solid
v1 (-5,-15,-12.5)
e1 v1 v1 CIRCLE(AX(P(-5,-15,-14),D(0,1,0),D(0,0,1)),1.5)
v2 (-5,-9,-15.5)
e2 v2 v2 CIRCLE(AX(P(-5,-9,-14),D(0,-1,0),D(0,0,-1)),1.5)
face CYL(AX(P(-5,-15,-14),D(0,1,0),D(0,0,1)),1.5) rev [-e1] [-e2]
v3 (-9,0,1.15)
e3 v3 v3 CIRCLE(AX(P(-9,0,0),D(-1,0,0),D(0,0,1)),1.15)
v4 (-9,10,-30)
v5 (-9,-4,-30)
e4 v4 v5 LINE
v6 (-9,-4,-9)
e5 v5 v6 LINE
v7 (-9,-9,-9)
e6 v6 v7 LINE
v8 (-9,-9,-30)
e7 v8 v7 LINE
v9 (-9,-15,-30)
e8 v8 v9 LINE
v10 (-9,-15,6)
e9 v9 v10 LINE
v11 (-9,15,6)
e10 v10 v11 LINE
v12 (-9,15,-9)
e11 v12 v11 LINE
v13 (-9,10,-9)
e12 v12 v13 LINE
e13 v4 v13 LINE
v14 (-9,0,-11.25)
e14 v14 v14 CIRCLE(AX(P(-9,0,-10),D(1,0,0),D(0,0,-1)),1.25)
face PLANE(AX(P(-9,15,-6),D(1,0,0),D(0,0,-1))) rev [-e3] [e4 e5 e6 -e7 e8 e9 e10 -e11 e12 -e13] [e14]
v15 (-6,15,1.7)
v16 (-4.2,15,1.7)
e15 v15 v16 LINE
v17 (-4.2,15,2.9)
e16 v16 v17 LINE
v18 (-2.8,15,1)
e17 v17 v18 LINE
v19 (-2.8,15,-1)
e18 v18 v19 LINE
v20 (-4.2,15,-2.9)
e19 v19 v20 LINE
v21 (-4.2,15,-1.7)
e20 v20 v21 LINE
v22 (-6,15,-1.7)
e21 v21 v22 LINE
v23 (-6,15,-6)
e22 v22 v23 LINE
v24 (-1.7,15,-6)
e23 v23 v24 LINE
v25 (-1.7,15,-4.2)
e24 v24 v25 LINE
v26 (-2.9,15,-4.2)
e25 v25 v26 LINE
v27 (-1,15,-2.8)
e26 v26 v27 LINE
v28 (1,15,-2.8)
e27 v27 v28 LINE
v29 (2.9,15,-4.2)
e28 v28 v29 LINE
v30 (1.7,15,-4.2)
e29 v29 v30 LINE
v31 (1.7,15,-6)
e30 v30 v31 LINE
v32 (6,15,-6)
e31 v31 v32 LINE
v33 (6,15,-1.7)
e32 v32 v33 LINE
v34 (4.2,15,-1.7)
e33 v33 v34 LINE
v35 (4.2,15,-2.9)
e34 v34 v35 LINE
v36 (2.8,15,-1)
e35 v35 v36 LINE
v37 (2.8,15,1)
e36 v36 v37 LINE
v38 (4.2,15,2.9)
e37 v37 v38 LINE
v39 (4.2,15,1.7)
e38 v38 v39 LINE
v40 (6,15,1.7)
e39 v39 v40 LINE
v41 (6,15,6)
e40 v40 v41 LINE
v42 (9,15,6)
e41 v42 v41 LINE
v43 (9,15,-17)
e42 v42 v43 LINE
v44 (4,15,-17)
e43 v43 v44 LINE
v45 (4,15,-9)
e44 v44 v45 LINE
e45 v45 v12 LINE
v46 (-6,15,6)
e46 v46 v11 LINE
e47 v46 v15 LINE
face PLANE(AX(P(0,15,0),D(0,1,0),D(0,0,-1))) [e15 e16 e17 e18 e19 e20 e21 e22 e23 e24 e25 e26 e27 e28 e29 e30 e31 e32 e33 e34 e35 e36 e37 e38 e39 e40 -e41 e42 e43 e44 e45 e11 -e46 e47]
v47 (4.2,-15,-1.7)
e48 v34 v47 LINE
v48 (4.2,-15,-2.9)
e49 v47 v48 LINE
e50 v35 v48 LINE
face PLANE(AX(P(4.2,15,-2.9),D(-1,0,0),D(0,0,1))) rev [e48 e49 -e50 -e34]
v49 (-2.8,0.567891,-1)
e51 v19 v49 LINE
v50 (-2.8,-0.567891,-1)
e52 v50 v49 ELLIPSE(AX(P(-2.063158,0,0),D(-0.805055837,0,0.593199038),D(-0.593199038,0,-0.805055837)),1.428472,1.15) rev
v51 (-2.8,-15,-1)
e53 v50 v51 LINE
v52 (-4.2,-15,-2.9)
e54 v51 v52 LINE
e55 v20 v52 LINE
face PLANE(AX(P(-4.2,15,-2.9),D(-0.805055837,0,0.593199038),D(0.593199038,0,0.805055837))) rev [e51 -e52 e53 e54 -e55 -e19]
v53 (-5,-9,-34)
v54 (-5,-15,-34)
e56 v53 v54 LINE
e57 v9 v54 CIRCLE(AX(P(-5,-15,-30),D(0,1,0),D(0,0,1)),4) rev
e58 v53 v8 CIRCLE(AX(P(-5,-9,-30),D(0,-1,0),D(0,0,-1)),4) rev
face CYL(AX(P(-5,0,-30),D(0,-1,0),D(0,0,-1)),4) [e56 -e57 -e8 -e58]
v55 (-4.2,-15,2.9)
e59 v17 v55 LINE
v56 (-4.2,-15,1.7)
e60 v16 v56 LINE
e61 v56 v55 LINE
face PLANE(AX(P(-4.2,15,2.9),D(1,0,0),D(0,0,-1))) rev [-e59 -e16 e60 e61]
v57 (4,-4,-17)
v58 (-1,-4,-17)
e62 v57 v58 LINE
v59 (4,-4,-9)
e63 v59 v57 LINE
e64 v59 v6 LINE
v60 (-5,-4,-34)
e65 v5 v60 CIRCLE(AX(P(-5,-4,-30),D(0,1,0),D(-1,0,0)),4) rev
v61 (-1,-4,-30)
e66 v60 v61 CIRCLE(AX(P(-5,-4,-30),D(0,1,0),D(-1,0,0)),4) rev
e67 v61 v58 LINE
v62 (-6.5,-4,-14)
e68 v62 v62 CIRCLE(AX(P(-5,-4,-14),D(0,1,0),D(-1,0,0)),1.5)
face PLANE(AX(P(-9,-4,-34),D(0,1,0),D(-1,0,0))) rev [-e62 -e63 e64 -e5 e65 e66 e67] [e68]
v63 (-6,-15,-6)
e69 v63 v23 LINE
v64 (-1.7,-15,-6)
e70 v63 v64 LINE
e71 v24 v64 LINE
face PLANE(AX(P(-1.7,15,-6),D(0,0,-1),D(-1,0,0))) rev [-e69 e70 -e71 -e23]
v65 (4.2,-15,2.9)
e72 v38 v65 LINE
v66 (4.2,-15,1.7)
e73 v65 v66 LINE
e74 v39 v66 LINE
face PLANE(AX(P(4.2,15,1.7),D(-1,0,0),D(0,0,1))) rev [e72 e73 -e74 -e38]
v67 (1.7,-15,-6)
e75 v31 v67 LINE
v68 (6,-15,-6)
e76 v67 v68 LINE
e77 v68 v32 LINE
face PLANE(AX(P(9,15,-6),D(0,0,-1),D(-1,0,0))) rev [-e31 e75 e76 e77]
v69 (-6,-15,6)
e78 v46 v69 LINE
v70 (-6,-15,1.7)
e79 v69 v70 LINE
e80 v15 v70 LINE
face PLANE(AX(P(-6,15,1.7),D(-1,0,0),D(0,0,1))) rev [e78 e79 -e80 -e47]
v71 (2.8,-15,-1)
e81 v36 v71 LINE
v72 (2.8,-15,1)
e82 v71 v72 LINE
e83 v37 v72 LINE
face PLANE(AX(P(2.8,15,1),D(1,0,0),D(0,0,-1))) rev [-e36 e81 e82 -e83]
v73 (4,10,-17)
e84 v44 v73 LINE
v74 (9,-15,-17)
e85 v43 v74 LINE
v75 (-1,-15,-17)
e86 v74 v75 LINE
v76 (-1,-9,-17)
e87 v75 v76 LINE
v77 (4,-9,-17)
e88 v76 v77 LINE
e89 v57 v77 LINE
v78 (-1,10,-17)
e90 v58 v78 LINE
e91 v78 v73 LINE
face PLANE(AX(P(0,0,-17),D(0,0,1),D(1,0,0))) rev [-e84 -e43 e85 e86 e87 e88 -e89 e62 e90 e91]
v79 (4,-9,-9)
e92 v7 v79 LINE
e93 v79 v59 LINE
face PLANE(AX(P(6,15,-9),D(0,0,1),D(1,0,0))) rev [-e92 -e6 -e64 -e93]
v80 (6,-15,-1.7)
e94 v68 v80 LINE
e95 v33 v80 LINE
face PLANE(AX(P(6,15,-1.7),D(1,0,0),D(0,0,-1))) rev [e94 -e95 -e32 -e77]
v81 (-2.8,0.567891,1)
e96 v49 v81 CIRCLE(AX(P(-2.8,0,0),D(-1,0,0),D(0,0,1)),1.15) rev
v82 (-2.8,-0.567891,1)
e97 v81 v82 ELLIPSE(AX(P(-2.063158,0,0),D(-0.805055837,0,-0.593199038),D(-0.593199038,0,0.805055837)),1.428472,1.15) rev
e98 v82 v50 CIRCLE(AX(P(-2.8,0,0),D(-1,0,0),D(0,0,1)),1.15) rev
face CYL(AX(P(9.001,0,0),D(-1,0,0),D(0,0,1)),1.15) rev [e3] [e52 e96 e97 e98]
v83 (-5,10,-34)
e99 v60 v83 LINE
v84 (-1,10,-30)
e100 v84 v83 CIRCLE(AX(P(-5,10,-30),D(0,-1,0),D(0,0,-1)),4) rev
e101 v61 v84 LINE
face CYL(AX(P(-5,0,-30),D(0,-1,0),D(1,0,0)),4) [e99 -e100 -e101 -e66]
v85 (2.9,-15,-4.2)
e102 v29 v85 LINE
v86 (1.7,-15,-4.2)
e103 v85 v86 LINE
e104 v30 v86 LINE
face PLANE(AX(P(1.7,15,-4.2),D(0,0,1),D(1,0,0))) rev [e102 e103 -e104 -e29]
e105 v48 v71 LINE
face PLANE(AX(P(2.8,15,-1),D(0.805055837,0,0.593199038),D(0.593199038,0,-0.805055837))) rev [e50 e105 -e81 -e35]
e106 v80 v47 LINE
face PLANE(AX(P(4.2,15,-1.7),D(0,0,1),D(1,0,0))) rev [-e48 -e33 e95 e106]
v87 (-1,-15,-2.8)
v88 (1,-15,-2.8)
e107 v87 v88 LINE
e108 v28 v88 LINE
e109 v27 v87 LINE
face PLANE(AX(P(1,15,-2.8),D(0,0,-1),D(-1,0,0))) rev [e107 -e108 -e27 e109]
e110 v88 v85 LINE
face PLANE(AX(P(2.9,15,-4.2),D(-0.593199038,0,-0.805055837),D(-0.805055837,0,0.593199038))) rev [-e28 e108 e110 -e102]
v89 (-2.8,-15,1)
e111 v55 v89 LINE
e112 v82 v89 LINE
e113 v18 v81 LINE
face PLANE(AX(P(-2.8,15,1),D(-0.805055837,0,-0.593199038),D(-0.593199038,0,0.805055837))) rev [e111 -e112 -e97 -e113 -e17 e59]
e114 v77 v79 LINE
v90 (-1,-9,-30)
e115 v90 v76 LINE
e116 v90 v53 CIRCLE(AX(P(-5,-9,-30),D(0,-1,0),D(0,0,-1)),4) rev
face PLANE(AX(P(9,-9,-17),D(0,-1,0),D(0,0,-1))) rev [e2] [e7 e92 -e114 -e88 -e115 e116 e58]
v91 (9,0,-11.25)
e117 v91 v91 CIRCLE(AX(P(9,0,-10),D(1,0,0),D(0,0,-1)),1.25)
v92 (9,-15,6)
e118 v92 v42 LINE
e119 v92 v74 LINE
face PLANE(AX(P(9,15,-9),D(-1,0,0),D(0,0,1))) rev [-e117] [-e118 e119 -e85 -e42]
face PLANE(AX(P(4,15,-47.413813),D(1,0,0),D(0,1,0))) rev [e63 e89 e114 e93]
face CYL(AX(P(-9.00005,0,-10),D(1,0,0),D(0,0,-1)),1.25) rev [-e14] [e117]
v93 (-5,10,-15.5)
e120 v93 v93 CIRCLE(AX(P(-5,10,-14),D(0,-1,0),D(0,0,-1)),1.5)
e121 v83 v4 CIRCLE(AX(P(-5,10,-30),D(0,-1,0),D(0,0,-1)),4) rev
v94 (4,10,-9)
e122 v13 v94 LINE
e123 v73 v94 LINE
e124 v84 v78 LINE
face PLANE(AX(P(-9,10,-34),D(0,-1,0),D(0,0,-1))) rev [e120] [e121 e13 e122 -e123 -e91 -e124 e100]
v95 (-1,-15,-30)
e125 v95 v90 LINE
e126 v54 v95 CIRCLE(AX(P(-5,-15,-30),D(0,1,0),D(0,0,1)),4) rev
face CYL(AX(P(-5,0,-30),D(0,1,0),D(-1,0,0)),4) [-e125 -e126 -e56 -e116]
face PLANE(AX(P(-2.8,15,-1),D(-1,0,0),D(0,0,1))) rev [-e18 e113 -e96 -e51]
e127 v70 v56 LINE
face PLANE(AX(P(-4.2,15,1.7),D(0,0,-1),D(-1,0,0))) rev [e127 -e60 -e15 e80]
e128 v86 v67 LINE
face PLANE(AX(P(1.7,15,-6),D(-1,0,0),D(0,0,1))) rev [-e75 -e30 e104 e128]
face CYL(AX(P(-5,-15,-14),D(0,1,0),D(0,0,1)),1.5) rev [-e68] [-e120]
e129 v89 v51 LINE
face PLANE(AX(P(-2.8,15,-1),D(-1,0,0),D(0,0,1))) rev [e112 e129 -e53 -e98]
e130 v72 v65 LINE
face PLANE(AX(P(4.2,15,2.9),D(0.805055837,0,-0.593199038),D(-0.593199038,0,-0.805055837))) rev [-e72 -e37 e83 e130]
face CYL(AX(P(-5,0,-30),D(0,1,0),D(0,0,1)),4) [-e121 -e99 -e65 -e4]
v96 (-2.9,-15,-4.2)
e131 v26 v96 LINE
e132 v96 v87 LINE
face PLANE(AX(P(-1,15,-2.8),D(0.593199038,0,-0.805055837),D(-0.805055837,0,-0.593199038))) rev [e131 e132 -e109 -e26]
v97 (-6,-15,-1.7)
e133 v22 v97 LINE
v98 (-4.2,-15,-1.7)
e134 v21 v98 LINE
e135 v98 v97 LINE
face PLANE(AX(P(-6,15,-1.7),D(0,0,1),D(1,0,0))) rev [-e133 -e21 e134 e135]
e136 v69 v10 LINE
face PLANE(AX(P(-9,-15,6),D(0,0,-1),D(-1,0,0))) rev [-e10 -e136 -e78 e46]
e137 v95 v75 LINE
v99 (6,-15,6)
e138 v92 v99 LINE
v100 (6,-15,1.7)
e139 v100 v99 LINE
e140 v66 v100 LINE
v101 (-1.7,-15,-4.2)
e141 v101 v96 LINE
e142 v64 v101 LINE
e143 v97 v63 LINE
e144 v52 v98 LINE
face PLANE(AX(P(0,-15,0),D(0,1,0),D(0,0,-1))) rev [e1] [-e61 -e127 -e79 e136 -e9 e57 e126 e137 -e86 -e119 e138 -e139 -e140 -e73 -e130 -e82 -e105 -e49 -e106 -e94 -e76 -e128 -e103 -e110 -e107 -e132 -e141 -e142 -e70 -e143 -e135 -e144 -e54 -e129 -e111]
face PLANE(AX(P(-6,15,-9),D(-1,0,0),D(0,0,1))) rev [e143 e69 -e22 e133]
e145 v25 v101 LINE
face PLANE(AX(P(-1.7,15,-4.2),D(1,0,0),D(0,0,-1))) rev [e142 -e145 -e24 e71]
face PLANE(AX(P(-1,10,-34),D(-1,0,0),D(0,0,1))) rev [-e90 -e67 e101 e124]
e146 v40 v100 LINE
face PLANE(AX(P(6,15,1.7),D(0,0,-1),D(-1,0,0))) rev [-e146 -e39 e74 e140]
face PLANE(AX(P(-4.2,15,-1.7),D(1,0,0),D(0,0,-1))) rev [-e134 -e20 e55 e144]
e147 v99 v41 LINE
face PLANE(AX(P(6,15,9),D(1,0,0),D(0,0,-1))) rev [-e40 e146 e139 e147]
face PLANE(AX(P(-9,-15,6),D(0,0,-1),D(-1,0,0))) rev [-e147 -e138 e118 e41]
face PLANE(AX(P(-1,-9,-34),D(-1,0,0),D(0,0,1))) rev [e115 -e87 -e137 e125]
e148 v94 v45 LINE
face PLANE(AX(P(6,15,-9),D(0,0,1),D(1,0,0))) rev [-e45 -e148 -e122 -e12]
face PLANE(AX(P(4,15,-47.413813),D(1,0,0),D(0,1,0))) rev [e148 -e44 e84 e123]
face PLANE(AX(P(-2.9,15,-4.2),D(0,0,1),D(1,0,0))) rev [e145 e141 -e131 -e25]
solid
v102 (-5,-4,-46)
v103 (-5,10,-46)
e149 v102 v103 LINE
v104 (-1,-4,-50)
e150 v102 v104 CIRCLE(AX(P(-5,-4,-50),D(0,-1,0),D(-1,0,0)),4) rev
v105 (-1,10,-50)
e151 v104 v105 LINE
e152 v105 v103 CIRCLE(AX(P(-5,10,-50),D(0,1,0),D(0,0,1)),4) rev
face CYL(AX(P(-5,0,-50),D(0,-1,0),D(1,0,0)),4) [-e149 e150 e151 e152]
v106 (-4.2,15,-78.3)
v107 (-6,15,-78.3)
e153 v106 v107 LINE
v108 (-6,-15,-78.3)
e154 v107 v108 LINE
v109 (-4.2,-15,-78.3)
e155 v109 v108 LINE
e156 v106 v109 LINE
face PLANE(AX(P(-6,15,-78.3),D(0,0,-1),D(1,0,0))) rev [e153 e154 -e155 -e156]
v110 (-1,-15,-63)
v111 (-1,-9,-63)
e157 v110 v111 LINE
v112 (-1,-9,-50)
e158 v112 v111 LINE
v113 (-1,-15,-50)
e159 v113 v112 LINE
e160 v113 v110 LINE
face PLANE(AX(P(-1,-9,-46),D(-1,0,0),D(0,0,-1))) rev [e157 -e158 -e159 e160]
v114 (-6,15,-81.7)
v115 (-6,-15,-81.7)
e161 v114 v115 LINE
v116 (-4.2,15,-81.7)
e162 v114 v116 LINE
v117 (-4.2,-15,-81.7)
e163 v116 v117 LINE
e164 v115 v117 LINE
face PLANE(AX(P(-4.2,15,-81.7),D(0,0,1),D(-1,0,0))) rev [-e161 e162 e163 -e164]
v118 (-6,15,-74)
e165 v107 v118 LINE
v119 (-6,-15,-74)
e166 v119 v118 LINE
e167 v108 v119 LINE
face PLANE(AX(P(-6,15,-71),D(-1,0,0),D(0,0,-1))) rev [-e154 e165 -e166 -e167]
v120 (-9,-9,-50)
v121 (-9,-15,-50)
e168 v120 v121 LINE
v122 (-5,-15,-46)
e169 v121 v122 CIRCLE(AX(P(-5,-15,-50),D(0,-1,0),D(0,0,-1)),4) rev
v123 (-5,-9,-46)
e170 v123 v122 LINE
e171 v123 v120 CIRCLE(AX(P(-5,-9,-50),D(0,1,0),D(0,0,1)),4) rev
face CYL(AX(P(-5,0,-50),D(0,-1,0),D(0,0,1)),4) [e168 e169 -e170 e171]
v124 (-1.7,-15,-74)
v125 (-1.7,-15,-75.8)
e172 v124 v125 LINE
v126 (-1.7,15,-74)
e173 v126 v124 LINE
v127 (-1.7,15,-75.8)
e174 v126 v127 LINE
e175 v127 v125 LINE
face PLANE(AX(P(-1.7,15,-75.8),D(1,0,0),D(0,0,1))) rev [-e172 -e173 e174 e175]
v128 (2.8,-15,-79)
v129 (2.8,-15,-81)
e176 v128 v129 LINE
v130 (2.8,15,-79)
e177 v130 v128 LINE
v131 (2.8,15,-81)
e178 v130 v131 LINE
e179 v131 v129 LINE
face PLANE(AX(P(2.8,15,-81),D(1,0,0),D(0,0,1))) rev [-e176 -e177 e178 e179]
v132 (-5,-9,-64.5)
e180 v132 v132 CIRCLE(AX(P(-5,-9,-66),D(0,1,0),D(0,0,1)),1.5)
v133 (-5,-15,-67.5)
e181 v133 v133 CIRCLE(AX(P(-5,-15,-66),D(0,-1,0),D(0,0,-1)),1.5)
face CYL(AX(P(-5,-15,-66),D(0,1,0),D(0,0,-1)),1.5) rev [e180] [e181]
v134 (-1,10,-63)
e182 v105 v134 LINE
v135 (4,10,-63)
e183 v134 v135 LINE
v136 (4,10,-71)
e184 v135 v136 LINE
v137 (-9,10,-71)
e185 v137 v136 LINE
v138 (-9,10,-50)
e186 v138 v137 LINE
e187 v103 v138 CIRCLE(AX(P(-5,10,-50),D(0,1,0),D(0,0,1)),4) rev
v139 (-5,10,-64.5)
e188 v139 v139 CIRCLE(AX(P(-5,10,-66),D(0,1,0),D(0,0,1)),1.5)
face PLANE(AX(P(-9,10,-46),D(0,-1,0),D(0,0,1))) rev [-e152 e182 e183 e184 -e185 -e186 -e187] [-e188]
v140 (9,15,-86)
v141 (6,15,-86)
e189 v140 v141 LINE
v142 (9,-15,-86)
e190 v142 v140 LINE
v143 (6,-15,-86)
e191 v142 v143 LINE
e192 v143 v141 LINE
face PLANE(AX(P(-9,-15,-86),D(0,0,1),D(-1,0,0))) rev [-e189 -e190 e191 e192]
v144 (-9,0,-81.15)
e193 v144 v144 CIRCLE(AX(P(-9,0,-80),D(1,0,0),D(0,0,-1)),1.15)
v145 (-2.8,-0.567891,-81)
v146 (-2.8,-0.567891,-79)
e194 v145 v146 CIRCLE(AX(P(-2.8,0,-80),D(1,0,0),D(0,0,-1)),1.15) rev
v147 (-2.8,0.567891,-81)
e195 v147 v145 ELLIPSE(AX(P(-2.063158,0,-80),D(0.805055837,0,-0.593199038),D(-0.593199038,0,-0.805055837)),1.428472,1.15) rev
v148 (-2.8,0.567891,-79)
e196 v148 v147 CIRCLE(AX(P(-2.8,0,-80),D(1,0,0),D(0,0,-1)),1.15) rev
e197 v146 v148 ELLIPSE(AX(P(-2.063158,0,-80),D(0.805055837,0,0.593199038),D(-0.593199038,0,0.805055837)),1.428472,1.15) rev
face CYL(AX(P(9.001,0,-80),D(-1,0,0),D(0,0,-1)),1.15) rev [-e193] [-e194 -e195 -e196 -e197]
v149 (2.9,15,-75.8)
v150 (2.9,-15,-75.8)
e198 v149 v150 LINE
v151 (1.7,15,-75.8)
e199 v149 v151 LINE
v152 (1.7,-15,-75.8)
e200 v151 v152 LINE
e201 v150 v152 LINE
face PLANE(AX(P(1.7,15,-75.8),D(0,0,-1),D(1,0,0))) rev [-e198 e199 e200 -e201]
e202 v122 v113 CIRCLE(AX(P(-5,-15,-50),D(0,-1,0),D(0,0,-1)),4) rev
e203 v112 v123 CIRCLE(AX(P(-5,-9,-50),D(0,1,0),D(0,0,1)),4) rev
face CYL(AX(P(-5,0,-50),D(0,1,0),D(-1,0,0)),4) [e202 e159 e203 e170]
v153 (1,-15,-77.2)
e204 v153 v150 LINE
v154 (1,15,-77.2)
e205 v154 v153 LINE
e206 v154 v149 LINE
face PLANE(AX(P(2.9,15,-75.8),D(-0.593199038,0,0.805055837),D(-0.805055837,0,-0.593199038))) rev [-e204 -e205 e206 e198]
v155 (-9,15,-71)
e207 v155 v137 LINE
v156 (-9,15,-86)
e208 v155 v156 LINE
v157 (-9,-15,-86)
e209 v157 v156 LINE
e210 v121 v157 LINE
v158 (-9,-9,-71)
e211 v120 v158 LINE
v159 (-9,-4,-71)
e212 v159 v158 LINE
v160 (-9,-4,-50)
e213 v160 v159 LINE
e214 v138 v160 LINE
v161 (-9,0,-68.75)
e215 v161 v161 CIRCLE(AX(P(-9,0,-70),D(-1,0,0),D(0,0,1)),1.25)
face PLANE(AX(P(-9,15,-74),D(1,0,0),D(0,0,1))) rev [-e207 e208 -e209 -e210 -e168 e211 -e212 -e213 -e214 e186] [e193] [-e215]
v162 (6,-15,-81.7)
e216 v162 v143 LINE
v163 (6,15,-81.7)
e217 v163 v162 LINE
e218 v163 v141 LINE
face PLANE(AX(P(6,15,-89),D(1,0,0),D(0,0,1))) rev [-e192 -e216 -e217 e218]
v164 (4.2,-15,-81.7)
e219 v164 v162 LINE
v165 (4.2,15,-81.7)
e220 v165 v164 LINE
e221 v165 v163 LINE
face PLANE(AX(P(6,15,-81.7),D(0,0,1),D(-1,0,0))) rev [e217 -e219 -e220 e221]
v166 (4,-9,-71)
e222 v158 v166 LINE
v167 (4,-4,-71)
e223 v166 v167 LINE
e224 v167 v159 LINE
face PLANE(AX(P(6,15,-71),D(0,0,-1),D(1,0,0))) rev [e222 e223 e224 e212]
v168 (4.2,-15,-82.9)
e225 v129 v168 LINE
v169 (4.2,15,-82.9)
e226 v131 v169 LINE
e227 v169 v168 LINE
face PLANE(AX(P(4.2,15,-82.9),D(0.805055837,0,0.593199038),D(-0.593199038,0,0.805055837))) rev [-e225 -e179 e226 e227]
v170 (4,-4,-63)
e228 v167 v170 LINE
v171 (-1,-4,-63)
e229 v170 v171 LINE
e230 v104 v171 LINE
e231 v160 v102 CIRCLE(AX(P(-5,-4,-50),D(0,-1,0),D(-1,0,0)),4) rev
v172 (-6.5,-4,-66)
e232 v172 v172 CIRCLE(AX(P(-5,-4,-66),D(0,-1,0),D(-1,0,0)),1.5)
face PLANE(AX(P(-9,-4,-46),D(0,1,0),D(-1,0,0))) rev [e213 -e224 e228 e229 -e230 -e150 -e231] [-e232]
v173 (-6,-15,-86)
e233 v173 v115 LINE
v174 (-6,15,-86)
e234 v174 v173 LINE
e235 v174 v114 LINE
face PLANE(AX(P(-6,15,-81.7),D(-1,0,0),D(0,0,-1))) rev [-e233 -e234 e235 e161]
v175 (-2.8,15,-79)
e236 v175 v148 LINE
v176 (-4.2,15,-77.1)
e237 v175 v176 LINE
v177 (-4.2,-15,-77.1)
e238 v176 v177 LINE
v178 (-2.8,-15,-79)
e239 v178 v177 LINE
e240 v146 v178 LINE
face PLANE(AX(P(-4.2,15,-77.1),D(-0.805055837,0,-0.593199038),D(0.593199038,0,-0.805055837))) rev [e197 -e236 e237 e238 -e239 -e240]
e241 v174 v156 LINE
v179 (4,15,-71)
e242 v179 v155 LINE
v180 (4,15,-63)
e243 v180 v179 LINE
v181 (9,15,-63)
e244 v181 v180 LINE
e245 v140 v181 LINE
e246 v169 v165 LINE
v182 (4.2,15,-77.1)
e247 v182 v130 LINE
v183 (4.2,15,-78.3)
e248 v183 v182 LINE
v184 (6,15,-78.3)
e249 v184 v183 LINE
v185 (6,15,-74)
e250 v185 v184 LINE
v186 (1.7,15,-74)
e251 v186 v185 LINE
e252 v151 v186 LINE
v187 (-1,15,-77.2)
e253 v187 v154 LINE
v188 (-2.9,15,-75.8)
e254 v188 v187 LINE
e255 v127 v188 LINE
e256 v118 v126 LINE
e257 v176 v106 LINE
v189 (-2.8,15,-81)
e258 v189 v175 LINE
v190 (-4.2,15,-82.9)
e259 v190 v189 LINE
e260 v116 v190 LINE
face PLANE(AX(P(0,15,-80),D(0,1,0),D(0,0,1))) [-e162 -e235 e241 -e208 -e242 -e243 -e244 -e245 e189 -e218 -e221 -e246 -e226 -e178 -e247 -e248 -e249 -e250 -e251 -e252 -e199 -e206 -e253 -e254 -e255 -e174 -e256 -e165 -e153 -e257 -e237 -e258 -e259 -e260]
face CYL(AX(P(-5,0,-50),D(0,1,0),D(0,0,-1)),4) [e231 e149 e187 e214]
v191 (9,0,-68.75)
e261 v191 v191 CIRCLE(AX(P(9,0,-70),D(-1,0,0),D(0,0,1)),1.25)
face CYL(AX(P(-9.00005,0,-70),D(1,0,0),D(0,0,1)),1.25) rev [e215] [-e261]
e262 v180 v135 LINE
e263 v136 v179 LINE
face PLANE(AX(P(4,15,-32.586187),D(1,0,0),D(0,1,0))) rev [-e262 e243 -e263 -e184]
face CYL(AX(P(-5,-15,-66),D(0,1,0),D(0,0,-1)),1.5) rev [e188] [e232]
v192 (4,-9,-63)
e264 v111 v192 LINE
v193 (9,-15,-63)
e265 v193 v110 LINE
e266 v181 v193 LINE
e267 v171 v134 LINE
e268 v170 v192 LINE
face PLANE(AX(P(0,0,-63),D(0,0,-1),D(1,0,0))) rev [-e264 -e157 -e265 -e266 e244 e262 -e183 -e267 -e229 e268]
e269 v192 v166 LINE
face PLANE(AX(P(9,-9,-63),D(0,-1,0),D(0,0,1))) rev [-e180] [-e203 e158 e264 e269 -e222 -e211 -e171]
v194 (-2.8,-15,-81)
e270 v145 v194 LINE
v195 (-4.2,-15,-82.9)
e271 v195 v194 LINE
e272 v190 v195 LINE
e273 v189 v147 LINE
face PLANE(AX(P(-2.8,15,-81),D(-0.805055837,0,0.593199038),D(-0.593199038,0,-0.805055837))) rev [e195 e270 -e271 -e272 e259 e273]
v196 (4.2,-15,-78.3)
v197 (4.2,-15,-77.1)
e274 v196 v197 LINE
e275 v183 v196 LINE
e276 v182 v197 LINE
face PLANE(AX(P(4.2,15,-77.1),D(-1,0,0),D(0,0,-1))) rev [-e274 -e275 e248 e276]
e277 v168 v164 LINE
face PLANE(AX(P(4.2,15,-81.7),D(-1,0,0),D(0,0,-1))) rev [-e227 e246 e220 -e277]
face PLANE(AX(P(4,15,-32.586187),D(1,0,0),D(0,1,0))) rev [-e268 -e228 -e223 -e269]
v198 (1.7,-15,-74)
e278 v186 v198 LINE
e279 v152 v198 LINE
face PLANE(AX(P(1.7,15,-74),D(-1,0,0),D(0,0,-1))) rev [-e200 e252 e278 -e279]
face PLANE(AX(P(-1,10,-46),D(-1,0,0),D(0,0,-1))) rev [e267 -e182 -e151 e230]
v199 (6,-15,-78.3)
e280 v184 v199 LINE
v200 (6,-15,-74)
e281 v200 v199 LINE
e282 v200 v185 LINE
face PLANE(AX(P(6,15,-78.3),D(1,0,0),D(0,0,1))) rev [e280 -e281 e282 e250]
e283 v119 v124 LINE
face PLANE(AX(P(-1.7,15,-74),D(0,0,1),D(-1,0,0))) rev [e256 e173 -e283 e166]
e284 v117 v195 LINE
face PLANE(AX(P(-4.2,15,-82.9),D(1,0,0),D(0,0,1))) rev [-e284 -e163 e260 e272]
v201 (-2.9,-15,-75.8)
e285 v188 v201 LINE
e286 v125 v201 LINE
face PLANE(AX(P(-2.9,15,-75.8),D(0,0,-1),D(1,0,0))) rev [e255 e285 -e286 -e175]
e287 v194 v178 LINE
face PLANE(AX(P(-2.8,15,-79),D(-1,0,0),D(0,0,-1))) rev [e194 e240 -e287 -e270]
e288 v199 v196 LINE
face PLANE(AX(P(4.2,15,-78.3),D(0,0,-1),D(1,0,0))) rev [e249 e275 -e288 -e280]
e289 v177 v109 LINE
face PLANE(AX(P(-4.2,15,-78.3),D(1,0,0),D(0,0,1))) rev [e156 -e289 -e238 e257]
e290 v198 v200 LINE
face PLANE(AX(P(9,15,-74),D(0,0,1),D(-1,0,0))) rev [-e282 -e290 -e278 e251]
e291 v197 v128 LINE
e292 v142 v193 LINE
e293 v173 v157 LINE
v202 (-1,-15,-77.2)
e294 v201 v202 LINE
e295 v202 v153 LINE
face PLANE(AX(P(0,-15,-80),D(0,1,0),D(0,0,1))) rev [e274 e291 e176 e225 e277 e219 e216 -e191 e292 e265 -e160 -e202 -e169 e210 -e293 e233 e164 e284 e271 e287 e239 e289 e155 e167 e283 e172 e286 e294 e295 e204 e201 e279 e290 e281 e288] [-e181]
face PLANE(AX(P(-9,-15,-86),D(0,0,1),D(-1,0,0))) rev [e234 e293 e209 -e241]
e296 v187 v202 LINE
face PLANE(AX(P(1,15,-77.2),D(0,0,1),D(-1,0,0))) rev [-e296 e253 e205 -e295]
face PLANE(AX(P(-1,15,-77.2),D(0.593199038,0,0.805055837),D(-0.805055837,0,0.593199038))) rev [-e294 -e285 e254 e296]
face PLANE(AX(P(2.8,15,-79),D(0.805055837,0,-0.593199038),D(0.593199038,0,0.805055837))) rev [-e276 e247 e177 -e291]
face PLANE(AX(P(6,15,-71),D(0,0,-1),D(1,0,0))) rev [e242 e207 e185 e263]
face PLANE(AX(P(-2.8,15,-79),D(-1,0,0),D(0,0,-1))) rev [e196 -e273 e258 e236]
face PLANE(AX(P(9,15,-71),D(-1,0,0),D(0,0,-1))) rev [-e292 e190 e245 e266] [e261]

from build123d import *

# Parameters (mm, degrees)
BOSS_EXTRU_6_DEPTH           = 15
R_P_TITION_CIRCULAIRE3_COUNT = 3
R_P_TITION_CIRCULAIRE3_ANGLE = 180
ESQUISSE9_W                  = 18
ESQUISSE9_H                  = 3
ENL_V_MAT_EXTRU_1_DEPTH      = 33.588341474
ESQUISSE10_W                 = 8
ESQUISSE10_H                 = 14
ESQUISSE10_H_2               = 6
BOSS_EXTRU_7_DEPTH           = 25
ESQUISSE12_W                 = 10
ESQUISSE12_H                 = 6
ESQUISSE12_H_2               = 14
BOSS_EXTRU_8_DEPTH           = 8
CONG_1_R                     = 4
ESQUISSE11_R                 = 1.5
ENL_V_MAT_EXTRU_2_DEPTH      = 47.227697325
ESQUISSE13_W                 = 5
ESQUISSE13_H                 = 30
BOSS_EXTRU_9_DEPTH           = 8
ESQUISSE16_R                 = 1.25
ENL_V_MAT_EXTRU_3_DEPTH      = 42.291645644
ENL_V_MAT_EXTRU_4_REACH      = 43.292
ESQUISSE17_R                 = 1.15


with BuildPart() as part:
    # Esquisse8 → Boss.-Extru.6 (new, symmetric)
    with BuildSketch(Plane(origin=(0, 0, 0), x_dir=(1, 0, 0), z_dir=(0, 1, 0))):
        Polygon((-6, 1.7), (-4.2, 1.7), (-4.2, 2.9), (-2.8, 1), (-2.8, -1), (-4.2, -2.9), (-4.2, -1.7), (-6, -1.7), (-6, -9), (-9, -9), (-9, 9), (-6, 9), align=None)
    extrude(amount=BOSS_EXTRU_6_DEPTH, both=True)


with BuildPart() as r_p_tition_circulaire3_1:
    # Répétition circulaire3: pattern copy
    add(part.part.rotate(Axis((0, 0, 0), (0, -1, 0)), 1 * R_P_TITION_CIRCULAIRE3_ANGLE / (R_P_TITION_CIRCULAIRE3_COUNT - 1)))


with BuildPart() as r_p_tition_circulaire3_2:
    # Répétition circulaire3: pattern copy
    add(part.part.rotate(Axis((0, 0, 0), (0, -1, 0)), 2 * R_P_TITION_CIRCULAIRE3_ANGLE / (R_P_TITION_CIRCULAIRE3_COUNT - 1)))


with BuildPart() as enl_v_mat_extru_1_tool:
    # Esquisse9 → Enlèv. mat.-Extru.1 (new, through all)
    with BuildSketch(Plane(origin=(0, 15, 0), x_dir=(1, 0, 0), z_dir=(0, 1, 0))):
        with Locations((0, -7.5)):
            Rectangle(ESQUISSE9_W, ESQUISSE9_H)
    extrude(amount=-ENL_V_MAT_EXTRU_1_DEPTH)


with BuildPart() as part_1:
    add(part.part)

    # Enlèv. mat.-Extru.1: cut by enl_v_mat_extru_1_tool
    add(enl_v_mat_extru_1_tool.part, mode=Mode.SUBTRACT)


    add(r_p_tition_circulaire3_1.part)  # Boss.-Extru.7 merges Répétition circulaire3_1
    # Esquisse10 → Boss.-Extru.7 (add)
    with BuildSketch(Plane(origin=(0, 0, -9), x_dir=(-1, 0, 0), z_dir=(0, 0, -1))):
        with Locations((5, 3)):
            Rectangle(ESQUISSE10_W, ESQUISSE10_H)
        with Locations((5, -12)):
            Rectangle(ESQUISSE10_W, ESQUISSE10_H_2)
    extrude(amount=BOSS_EXTRU_7_DEPTH)



with BuildPart() as r_p_tition_circulaire3_2_1:
    add(r_p_tition_circulaire3_2.part)

    # Enlèv. mat.-Extru.1: cut by enl_v_mat_extru_1_tool
    add(enl_v_mat_extru_1_tool.part, mode=Mode.SUBTRACT)


with BuildPart() as part_2:
    add(part_1.part)

    add(r_p_tition_circulaire3_2_1.part)  # Boss.-Extru.8 merges Répétition circulaire3_2
    # Esquisse12 → Boss.-Extru.8 (add)
    with BuildSketch(Plane(origin=(0, 0, -9), x_dir=(-1, 0, 0), z_dir=(0, 0, -1))):
        with Locations((-4, -12)):
            Rectangle(ESQUISSE12_W, ESQUISSE12_H)
        with Locations((-4, 3)):
            Rectangle(ESQUISSE12_W, ESQUISSE12_H_2)
    extrude(amount=BOSS_EXTRU_8_DEPTH)

    # Congé1
    cong_1_edges = [part_2.edges().sort_by_distance(p)[0] for p in [
        (-9, 3, -34),
        (-1, -12, -34),
        (-9, -12, -34),
        (-1, 3, -34),
    ]]
    fillet(cong_1_edges, radius=CONG_1_R - 0.0001)  # a hair under: the kernel refuses the full size

    # Esquisse11 → Enlèv. mat.-Extru.2 (cut, through all)
    with BuildSketch(Plane(origin=(0, 15, 0), x_dir=(1, 0, 0), z_dir=(0, 1, 0))):
        with Locations(Location((-5, 14, 0), (0, 0, 180))):
            Circle(ESQUISSE11_R)
    extrude(amount=-ENL_V_MAT_EXTRU_2_DEPTH, mode=Mode.SUBTRACT)

    # Esquisse13 → Boss.-Extru.9 (add)
    with BuildSketch(Plane(origin=(0, 0, -9), x_dir=(-1, 0, 0), z_dir=(0, 0, -1))):
        with Locations((-6.5, 0)):
            Rectangle(ESQUISSE13_W, ESQUISSE13_H)
    extrude(amount=BOSS_EXTRU_9_DEPTH)

    # Esquisse16 → Enlèv. mat.-Extru.3 (cut, through all)
    with BuildSketch(Plane(origin=(9, 0, 0), x_dir=(0, 0, -1), z_dir=(1, 0, 0))):
        with Locations((10, 0)):
            Circle(ESQUISSE16_R)
    extrude(amount=-ENL_V_MAT_EXTRU_3_DEPTH, mode=Mode.SUBTRACT)

    # Esquisse17 → Enlèv. mat.-Extru.4 (cut, up to next)
    with BuildSketch(Plane.ZY.offset(9), mode=Mode.PRIVATE) as enl_v_mat_extru_4_sk1:
        Circle(ESQUISSE17_R)
    enl_v_mat_extru_4_tool1 = extrude(enl_v_mat_extru_4_sk1.sketch, amount=-ENL_V_MAT_EXTRU_4_REACH, mode=Mode.PRIVATE) & part_2.part
    add(enl_v_mat_extru_4_tool1.solids().sort_by_distance((-9, 0, 0))[0], mode=Mode.SUBTRACT)


with BuildPart() as body_2:
    # Symétrie2: mirrored copy
    add(part_2.part.mirror(Plane.XY.offset(-40)))


solid = Compound([part_2.part, body_2.part])
